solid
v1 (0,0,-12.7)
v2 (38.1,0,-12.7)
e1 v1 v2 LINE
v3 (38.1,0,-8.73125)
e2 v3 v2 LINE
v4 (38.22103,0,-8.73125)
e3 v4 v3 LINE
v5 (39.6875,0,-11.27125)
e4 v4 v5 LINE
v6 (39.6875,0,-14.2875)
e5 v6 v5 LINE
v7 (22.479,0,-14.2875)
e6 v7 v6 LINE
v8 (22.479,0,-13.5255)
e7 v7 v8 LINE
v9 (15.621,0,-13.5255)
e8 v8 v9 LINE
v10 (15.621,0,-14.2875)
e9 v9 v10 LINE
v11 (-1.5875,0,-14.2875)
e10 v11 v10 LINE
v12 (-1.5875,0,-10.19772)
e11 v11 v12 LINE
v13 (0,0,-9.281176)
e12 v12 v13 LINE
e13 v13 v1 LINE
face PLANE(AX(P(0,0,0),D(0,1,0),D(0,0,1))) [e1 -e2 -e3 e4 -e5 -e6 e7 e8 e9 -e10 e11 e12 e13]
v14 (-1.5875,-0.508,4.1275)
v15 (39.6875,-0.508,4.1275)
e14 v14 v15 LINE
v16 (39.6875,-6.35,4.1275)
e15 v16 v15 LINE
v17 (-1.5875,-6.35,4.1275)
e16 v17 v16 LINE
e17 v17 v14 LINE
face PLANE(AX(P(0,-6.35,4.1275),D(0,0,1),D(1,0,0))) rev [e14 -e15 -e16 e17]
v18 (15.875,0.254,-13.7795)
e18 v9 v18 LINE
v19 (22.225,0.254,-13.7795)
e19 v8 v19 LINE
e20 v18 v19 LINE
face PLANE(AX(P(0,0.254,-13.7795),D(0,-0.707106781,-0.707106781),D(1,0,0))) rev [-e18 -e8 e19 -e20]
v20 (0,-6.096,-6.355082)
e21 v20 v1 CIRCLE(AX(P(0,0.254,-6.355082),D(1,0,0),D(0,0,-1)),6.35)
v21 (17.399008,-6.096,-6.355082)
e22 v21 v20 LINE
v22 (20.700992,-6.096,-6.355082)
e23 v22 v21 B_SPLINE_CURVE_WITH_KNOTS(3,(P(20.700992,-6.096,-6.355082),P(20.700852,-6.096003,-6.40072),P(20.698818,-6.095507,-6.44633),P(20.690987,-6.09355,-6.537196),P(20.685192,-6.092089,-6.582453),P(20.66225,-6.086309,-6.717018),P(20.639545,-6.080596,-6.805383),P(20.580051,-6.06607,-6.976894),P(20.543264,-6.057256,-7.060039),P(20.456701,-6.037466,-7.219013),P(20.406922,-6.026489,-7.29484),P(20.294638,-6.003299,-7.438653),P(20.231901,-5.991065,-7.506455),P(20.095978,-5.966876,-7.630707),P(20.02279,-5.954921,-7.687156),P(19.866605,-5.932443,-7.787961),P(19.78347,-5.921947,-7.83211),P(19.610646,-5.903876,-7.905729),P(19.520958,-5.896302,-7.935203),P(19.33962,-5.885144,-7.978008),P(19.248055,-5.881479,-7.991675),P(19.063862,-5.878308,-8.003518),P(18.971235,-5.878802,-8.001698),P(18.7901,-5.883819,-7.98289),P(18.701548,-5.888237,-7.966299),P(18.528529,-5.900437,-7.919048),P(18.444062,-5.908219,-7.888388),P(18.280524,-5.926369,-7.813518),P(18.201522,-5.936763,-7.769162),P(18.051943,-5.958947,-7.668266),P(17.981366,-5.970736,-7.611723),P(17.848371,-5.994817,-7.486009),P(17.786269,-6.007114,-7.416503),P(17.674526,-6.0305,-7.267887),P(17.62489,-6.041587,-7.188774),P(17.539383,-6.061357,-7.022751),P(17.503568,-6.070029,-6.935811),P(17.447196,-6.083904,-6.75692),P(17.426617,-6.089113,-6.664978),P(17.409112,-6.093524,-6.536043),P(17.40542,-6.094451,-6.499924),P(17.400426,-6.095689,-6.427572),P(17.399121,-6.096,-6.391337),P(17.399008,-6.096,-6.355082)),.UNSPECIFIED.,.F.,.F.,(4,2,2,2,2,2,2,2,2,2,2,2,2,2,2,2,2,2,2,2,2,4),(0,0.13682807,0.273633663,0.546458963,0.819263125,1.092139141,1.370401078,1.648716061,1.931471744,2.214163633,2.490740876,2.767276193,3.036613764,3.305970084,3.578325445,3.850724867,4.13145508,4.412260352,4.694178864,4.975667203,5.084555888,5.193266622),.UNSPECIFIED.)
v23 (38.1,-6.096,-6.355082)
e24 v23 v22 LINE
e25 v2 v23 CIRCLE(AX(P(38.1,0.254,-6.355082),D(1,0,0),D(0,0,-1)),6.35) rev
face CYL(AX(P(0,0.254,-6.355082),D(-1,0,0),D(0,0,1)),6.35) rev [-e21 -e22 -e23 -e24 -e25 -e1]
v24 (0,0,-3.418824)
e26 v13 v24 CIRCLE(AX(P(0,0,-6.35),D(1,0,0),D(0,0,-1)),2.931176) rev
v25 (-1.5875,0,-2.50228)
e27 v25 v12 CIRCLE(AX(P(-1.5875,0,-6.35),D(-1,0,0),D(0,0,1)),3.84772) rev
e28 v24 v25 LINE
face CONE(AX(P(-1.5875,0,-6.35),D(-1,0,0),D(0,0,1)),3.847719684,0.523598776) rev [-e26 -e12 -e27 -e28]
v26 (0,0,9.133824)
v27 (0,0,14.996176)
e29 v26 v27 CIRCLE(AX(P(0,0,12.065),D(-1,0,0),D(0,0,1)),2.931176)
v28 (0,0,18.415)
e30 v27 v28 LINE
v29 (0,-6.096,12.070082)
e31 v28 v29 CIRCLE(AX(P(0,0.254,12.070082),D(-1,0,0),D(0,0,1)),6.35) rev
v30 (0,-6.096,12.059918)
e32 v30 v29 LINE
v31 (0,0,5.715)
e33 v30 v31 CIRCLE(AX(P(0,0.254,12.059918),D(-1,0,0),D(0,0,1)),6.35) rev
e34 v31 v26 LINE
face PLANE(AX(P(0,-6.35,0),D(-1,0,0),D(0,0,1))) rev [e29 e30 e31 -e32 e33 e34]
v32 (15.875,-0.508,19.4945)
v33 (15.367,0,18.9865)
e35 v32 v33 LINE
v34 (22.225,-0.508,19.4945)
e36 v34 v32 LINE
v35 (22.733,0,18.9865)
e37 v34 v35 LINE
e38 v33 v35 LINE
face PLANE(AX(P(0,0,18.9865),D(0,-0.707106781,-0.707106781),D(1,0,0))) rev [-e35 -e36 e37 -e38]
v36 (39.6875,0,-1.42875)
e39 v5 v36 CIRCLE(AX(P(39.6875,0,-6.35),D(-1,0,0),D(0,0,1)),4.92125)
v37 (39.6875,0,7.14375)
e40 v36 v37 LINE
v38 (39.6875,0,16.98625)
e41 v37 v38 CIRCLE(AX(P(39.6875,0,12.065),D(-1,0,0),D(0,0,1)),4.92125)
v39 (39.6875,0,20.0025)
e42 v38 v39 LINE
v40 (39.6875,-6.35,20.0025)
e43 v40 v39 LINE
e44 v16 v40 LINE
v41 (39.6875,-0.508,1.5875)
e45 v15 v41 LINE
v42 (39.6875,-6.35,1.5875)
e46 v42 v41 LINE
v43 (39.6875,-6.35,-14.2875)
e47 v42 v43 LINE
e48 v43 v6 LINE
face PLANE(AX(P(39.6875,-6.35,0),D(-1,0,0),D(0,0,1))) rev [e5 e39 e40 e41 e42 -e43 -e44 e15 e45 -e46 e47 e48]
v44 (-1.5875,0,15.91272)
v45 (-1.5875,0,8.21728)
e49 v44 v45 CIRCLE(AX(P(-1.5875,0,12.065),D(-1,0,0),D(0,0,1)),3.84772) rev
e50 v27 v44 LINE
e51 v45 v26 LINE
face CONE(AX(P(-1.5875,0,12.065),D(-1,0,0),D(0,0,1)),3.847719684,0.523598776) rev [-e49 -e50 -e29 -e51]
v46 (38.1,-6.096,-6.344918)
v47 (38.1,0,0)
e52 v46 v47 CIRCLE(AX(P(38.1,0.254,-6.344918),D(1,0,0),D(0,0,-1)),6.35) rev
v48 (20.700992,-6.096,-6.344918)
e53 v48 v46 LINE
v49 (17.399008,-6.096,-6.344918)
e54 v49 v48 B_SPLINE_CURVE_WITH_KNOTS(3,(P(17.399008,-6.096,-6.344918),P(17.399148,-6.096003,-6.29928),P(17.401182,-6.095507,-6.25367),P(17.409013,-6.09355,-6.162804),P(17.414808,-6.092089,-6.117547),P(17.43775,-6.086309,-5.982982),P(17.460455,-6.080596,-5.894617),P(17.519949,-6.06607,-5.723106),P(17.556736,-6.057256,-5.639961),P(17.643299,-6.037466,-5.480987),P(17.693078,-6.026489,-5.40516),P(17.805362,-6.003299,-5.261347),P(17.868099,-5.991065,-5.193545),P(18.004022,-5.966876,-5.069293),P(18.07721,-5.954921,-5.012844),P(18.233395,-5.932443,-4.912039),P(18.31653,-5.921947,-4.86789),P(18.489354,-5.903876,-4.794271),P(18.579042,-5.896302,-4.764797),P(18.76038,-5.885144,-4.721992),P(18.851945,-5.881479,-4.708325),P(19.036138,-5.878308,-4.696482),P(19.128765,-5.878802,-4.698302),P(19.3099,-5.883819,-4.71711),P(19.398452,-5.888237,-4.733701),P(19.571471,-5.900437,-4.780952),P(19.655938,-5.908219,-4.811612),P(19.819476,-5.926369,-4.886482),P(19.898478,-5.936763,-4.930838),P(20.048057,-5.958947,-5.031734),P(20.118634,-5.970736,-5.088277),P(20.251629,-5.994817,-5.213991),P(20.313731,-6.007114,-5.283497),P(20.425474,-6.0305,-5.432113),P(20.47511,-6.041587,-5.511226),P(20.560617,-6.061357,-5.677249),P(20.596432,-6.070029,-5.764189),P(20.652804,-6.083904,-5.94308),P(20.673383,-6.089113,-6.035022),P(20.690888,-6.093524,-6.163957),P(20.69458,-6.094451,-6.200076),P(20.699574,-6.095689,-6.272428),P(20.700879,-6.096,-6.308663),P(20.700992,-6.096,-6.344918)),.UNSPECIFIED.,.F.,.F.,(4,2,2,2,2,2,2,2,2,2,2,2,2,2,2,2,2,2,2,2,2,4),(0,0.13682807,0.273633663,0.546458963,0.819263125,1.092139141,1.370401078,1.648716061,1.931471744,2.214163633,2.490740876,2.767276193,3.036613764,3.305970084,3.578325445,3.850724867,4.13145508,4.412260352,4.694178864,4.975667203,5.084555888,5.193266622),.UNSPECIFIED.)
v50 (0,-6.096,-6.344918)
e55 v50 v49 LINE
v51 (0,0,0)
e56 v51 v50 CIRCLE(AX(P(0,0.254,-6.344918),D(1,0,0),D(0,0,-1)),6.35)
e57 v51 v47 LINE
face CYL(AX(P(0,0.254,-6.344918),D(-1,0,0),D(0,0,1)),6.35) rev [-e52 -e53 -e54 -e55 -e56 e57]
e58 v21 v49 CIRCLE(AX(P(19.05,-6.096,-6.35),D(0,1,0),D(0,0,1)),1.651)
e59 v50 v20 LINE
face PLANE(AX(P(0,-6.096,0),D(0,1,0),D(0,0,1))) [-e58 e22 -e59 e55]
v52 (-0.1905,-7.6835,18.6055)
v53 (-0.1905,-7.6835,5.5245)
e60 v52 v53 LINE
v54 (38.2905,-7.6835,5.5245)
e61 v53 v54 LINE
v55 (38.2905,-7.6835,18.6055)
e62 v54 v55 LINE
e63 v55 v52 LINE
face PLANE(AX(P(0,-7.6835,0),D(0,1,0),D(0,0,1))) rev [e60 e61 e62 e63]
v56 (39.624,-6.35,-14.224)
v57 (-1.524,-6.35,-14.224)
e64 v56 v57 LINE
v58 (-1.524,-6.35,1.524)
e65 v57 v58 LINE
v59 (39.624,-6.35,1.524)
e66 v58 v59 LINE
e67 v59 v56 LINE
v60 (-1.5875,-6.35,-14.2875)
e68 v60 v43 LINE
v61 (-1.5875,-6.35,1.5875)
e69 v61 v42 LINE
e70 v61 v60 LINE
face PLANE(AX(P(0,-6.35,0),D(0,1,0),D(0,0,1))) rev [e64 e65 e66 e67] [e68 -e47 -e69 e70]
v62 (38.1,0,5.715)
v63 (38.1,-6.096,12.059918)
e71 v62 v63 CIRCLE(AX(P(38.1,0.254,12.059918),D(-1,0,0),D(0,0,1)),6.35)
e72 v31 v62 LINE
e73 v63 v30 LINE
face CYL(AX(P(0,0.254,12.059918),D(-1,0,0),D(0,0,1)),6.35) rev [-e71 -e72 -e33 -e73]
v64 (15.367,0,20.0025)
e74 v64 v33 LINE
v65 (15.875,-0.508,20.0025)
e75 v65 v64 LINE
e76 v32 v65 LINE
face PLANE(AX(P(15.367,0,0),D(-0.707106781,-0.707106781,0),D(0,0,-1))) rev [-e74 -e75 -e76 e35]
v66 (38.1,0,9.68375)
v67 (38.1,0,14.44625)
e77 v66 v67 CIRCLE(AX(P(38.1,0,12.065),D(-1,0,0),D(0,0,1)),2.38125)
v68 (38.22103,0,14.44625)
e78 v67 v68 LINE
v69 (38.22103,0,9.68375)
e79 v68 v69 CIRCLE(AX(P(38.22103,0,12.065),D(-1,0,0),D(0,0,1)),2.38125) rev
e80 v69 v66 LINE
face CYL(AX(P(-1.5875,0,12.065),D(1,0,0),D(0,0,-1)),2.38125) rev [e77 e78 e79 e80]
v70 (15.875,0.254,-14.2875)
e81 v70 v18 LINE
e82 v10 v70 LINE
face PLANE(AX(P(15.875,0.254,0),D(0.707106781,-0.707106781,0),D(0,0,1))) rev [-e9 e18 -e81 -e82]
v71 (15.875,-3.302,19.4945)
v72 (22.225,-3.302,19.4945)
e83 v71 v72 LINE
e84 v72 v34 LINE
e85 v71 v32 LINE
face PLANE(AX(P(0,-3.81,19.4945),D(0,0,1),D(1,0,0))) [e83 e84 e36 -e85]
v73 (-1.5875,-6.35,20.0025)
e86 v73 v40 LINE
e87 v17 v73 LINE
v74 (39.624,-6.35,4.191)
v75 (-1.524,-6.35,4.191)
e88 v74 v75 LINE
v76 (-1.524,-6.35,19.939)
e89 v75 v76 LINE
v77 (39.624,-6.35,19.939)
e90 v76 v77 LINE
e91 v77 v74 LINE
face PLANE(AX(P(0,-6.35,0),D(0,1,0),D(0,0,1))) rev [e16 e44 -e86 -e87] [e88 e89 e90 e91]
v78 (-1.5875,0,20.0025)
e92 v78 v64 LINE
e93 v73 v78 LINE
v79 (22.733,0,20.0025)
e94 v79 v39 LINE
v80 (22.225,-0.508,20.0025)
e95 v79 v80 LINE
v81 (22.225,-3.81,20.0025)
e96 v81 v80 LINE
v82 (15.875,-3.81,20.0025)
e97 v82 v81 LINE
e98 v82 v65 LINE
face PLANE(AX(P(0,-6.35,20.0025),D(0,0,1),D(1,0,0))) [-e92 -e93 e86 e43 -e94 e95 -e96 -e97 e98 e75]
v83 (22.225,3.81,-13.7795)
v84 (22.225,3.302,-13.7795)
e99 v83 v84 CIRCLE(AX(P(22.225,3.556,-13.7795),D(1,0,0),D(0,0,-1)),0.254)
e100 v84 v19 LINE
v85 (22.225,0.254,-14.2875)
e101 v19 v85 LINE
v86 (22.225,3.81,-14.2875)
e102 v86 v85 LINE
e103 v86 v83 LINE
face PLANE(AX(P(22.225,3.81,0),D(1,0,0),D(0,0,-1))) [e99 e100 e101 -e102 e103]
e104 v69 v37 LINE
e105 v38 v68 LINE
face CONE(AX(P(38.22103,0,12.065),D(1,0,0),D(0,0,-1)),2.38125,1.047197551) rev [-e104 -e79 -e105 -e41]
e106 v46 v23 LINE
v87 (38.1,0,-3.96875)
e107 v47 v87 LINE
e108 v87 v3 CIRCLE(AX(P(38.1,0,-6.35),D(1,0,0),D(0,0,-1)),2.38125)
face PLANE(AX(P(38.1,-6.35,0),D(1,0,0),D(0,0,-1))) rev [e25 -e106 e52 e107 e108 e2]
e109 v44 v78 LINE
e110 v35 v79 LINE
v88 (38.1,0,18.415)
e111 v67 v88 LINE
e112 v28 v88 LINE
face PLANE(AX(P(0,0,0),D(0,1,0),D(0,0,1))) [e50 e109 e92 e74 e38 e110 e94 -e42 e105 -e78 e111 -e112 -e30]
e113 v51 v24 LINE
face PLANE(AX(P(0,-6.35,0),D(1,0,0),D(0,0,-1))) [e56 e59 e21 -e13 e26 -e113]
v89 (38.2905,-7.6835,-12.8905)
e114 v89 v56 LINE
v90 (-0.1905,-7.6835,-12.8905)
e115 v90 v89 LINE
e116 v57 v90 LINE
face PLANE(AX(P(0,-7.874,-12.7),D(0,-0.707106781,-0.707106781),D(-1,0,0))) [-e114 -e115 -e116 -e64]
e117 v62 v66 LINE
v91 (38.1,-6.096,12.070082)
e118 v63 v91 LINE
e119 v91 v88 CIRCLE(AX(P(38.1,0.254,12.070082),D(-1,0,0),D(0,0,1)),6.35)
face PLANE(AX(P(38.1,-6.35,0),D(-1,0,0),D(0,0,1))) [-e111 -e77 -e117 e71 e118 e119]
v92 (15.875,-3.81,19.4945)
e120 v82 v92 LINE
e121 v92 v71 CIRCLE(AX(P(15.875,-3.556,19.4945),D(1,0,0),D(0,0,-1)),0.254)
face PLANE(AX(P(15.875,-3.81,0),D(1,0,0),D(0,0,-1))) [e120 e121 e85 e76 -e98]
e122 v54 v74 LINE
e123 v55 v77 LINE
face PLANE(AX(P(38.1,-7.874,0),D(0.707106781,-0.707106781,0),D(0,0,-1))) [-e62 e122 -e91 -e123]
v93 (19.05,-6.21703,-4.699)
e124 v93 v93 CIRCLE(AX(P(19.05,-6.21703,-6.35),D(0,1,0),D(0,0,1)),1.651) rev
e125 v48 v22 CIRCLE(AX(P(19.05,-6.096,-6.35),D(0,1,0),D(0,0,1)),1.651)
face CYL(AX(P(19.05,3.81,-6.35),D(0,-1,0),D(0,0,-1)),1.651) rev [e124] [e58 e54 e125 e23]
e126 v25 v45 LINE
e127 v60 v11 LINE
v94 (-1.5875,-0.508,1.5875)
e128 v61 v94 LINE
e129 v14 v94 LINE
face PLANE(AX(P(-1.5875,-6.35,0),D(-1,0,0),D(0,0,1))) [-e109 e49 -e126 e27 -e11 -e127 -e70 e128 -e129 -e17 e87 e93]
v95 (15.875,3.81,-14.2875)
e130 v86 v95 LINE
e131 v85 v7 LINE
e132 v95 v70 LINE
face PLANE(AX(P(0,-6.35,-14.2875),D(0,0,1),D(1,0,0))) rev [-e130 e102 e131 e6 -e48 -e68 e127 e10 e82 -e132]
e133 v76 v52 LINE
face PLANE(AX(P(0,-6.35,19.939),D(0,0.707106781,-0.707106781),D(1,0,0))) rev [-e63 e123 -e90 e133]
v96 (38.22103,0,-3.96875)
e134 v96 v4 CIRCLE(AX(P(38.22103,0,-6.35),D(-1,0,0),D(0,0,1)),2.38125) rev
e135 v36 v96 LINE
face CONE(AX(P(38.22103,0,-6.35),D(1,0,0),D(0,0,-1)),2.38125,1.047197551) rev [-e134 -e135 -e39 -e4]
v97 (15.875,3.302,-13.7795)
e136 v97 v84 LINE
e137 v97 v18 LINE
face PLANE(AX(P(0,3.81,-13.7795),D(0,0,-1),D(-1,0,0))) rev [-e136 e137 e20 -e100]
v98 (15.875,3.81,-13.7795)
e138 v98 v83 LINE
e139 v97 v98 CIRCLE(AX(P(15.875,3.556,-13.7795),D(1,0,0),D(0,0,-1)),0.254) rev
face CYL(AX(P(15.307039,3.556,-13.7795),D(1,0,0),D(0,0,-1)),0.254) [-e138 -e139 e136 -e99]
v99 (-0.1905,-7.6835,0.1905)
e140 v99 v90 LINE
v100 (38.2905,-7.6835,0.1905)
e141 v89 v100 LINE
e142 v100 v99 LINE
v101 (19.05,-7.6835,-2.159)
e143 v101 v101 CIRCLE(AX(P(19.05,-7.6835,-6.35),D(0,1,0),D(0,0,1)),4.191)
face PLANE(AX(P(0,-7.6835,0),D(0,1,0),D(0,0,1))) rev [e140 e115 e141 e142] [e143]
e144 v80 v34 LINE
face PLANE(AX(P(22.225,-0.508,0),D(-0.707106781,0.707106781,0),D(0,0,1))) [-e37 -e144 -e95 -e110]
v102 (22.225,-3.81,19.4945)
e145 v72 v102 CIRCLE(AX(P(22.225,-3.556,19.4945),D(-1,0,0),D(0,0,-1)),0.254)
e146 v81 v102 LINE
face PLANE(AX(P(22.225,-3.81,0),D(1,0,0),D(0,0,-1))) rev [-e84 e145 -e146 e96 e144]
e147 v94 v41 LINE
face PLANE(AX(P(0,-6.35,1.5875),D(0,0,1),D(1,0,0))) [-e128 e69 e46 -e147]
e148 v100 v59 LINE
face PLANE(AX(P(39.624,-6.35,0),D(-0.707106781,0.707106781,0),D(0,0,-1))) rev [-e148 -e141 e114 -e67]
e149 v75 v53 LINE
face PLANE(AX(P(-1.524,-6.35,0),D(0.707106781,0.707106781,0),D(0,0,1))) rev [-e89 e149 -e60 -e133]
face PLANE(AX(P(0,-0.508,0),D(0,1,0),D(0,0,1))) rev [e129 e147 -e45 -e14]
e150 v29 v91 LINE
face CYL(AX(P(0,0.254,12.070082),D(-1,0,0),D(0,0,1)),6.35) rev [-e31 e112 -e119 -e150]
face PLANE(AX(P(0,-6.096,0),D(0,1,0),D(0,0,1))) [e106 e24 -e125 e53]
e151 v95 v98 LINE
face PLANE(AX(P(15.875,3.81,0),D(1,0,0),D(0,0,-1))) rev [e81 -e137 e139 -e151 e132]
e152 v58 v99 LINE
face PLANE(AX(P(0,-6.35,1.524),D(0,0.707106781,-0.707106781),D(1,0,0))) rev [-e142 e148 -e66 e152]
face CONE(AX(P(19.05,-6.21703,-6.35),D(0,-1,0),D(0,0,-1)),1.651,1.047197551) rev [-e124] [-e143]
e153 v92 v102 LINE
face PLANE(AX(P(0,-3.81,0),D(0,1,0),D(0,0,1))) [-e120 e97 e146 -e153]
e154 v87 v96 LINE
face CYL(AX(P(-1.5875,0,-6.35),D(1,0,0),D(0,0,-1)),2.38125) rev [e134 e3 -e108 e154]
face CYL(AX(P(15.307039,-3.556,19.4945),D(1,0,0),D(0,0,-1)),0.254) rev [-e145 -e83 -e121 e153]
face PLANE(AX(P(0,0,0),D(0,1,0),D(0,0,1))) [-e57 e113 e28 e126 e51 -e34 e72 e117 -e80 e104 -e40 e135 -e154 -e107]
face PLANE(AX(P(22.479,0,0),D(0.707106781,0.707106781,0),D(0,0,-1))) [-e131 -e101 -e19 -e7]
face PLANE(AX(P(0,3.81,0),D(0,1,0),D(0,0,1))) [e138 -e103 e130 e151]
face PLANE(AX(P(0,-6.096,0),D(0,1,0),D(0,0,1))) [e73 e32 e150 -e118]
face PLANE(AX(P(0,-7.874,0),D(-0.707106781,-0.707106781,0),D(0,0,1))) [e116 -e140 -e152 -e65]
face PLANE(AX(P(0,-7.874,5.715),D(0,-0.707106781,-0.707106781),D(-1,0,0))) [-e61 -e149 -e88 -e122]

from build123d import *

# Parameters (mm, degrees)
BOSS_EXTRUDE1_DEPTH  = 6.35
BOSS_EXTRUDE2_START  = -6.096
SKETCH1_3_W          = 38.1
SKETCH1_3_H          = 12.7
BOSS_EXTRUDE2_DEPTH  = 1.5875
SKETCH1_5_W          = 41.275
SKETCH1_5_H          = 1.27
BOSS_EXTRUDE4_DEPTH  = 0.508
CHAMFER2_SIZE        = 1.524
SKETCH5_R            = 2.38125
CUT_EXTRUDE1_DEPTH   = 47.505502938
CHAMFER3_SIZE        = 1.466469684
CHAMFER3_SIZE_2      = 2.54
SKETCH6_W            = 6.35
SKETCH6_H            = 0.508
BOSS_EXTRUDE7_DEPTH  = 3.81
BOSS_EXTRUDE10_DEPTH = 6.35
SKETCH6_5_W          = 6.35
SKETCH6_5_H          = 0.508
CUT_EXTRUDE2_DEPTH   = 3.81
CUT_EXTRUDE3_DEPTH   = 6.35
CHAMFER4_SIZE        = 0.508
CHAMFER5_SIZE        = 0.254
SKETCH10_R           = 1.651
CUT_EXTRUDE4_DEPTH   = 46.905317826
CHAMFER6_SIZE        = 2.54
CHAMFER6_SIZE2       = 1.466469684
FILLET1_R            = 6.35


with BuildPart() as part:
    # Sketch1 → Boss-Extrude1 (new body)
    with BuildSketch(Plane(origin=(0, 0, 0), x_dir=(1, 0, 0), z_dir=(0, 1, 0))):
        Polygon((-1.5875, 6.35), (-1.5875, -1.5875), (39.6875, -1.5875), (39.6875, 6.35), (38.1, 6.35), (38.1, 0), (0, 0), (0, 6.35), align=None)
        Polygon((39.6875, -4.1275), (-1.5875, -4.1275), (-1.5875, -12.065), (0, -12.065), (0, -5.715), (38.1, -5.715), (38.1, -12.065), (39.6875, -12.065), align=None)
        Polygon((0, -12.065), (-1.5875, -12.065), (-1.5875, -20.0025), (39.6875, -20.0025), (39.6875, -12.065), (38.1, -12.065), (38.1, -18.415), (0, -18.415), align=None)
        Polygon((-1.5875, 14.2875), (-1.5875, 6.35), (0, 6.35), (0, 12.7), (38.1, 12.7), (38.1, 6.35), (39.6875, 6.35), (39.6875, 14.2875), align=None)
    extrude(amount=-BOSS_EXTRUDE1_DEPTH)

    # Sketch1<3> → Boss-Extrude2 (add)
    with BuildSketch(Plane(origin=(0, 0, 0), x_dir=(1, 0, 0), z_dir=(0, 1, 0)).offset(BOSS_EXTRUDE2_START)):
        with Locations((19.05, -12.065)):
            Rectangle(SKETCH1_3_W, SKETCH1_3_H)
        with Locations((19.05, 6.35)):
            Rectangle(SKETCH1_3_W, SKETCH1_3_H)
    extrude(amount=-BOSS_EXTRUDE2_DEPTH)

    # Sketch1<5> → Boss-Extrude4 (add)
    with BuildSketch(Plane(origin=(0, 0, 0), x_dir=(1, 0, 0), z_dir=(0, 1, 0))):
        with Locations((19.05, -2.2225)):
            Rectangle(SKETCH1_5_W, SKETCH1_5_H)
        with Locations((19.05, -3.4925)):
            Rectangle(SKETCH1_5_W, SKETCH1_5_H)
    extrude(amount=-BOSS_EXTRUDE4_DEPTH)

    # Chamfer2
    # the kernel refuses this chamfer: 1.524 mm, written as the material it adds along each edge
    with BuildSketch(Plane(origin=(38.1, -6.35, 18.415), x_dir=(0, 0, 1), z_dir=(-1, 0, 0))) as chamfer2_piece_1_section:
        Polygon((CHAMFER2_SIZE, 0), (0, -CHAMFER2_SIZE), (0, 0), align=None)
    chamfer2_piece_1 = extrude(amount=38.1, mode=Mode.PRIVATE)
    chamfer2_piece_1 = split(chamfer2_piece_1, bisect_by=Plane(origin=(38.1, -7.6835, 18.415), z_dir=(0, 1, 0)), keep=Keep.TOP, mode=Mode.PRIVATE)
    add(chamfer2_piece_1)
    with BuildSketch(Plane(origin=(0, -6.35, 5.715), x_dir=(-1, 0, 0), z_dir=(0, 0, 1))) as chamfer2_piece_2_section:
        Polygon((CHAMFER2_SIZE, 0), (0, CHAMFER2_SIZE), (0, 0), align=None)
    chamfer2_piece_2 = extrude(amount=12.7, mode=Mode.PRIVATE)
    chamfer2_piece_2 = split(chamfer2_piece_2, bisect_by=Plane(origin=(0, -7.6835, 5.715), z_dir=(0, 1, 0)), keep=Keep.TOP, mode=Mode.PRIVATE)
    add(chamfer2_piece_2)
    with BuildSketch(Plane(origin=(38.1, -6.35, 18.415), x_dir=(1, 0, 0), z_dir=(0, 0, -1))) as chamfer2_piece_3_section:
        Polygon((CHAMFER2_SIZE, 0), (0, CHAMFER2_SIZE), (0, 0), align=None)
    chamfer2_piece_3 = extrude(amount=12.7, mode=Mode.PRIVATE)
    chamfer2_piece_3 = split(chamfer2_piece_3, bisect_by=Plane(origin=(38.1, -7.6835, 18.415), z_dir=(0, 1, 0)), keep=Keep.TOP, mode=Mode.PRIVATE)
    add(chamfer2_piece_3)
    with BuildSketch(Plane(origin=(0, -6.35, 5.715), x_dir=(0, 0, -1), z_dir=(1, 0, 0))) as chamfer2_piece_4_section:
        Polygon((CHAMFER2_SIZE, 0), (0, -CHAMFER2_SIZE), (0, 0), align=None)
    chamfer2_piece_4 = extrude(amount=38.1, mode=Mode.PRIVATE)
    chamfer2_piece_4 = split(chamfer2_piece_4, bisect_by=Plane(origin=(0, -7.6835, 5.715), z_dir=(0, 1, 0)), keep=Keep.TOP, mode=Mode.PRIVATE)
    add(chamfer2_piece_4)
    with BuildSketch(Plane(origin=(38.1, -6.35, 0), x_dir=(0, 0, 1), z_dir=(-1, 0, 0))) as chamfer2_piece_5_section:
        Polygon((CHAMFER2_SIZE, 0), (0, -CHAMFER2_SIZE), (0, 0), align=None)
    chamfer2_piece_5 = extrude(amount=38.1, mode=Mode.PRIVATE)
    chamfer2_piece_5 = split(chamfer2_piece_5, bisect_by=Plane(origin=(38.1, -7.6835, 0), z_dir=(0, 1, 0)), keep=Keep.TOP, mode=Mode.PRIVATE)
    add(chamfer2_piece_5)
    with BuildSketch(Plane(origin=(38.1, -6.35, 0), x_dir=(1, 0, 0), z_dir=(0, 0, -1))) as chamfer2_piece_6_section:
        Polygon((CHAMFER2_SIZE, 0), (0, CHAMFER2_SIZE), (0, 0), align=None)
    chamfer2_piece_6 = extrude(amount=12.7, mode=Mode.PRIVATE)
    chamfer2_piece_6 = split(chamfer2_piece_6, bisect_by=Plane(origin=(38.1, -7.6835, 0), z_dir=(0, 1, 0)), keep=Keep.TOP, mode=Mode.PRIVATE)
    add(chamfer2_piece_6)
    with BuildSketch(Plane(origin=(0, -6.35, -12.7), x_dir=(-1, 0, 0), z_dir=(0, 0, 1))) as chamfer2_piece_7_section:
        Polygon((CHAMFER2_SIZE, 0), (0, CHAMFER2_SIZE), (0, 0), align=None)
    chamfer2_piece_7 = extrude(amount=12.7, mode=Mode.PRIVATE)
    chamfer2_piece_7 = split(chamfer2_piece_7, bisect_by=Plane(origin=(0, -7.6835, -12.7), z_dir=(0, 1, 0)), keep=Keep.TOP, mode=Mode.PRIVATE)
    add(chamfer2_piece_7)
    with BuildSketch(Plane(origin=(0, -6.35, -12.7), x_dir=(0, 0, -1), z_dir=(1, 0, 0))) as chamfer2_piece_8_section:
        Polygon((CHAMFER2_SIZE, 0), (0, -CHAMFER2_SIZE), (0, 0), align=None)
    chamfer2_piece_8 = extrude(amount=38.1, mode=Mode.PRIVATE)
    chamfer2_piece_8 = split(chamfer2_piece_8, bisect_by=Plane(origin=(0, -7.6835, -12.7), z_dir=(0, 1, 0)), keep=Keep.TOP, mode=Mode.PRIVATE)
    add(chamfer2_piece_8)
    with BuildSketch(Plane(origin=(38.1, -6.35, 22.334244874), x_dir=(1, 0, 0), z_dir=(0, 0, -1))) as chamfer2_piece_9a_section:
        Polygon((CHAMFER2_SIZE, 0), (0, CHAMFER2_SIZE), (0, 0), align=None)
    chamfer2_piece_9a = extrude(amount=16.619244874, mode=Mode.PRIVATE)
    chamfer2_piece_9a = split(chamfer2_piece_9a, bisect_by=Plane(origin=(38.1, -6.35, 20.0025), z_dir=(0, 0, -1)), keep=Keep.TOP, mode=Mode.PRIVATE)
    chamfer2_piece_9a = split(chamfer2_piece_9a, bisect_by=Plane(origin=(38.1, -6.35, 18.415), z_dir=(0, 0, 1)), keep=Keep.TOP, mode=Mode.PRIVATE)
    chamfer2_piece_9a = split(chamfer2_piece_9a, bisect_by=Plane(origin=(38.1, -7.6835, 22.334244874), z_dir=(0, 1, 0)), keep=Keep.TOP, mode=Mode.PRIVATE)
    with BuildSketch(Plane(origin=(42.019244874, -6.35, 18.415), x_dir=(0, 0, 1), z_dir=(-1, 0, 0))) as chamfer2_piece_9b_section:
        Polygon((CHAMFER2_SIZE, 0), (0, -CHAMFER2_SIZE), (0, 0), align=None)
    chamfer2_piece_9b = extrude(amount=42.019244874, mode=Mode.PRIVATE)
    chamfer2_piece_9b = split(chamfer2_piece_9b, bisect_by=Plane(origin=(39.6875, -6.35, 18.415), z_dir=(-1, 0, 0)), keep=Keep.TOP, mode=Mode.PRIVATE)
    chamfer2_piece_9b = split(chamfer2_piece_9b, bisect_by=Plane(origin=(42.019244874, -7.6835, 18.415), z_dir=(0, 1, 0)), keep=Keep.TOP, mode=Mode.PRIVATE)
    chamfer2_piece_9b = split(chamfer2_piece_9b, bisect_by=Plane(origin=(38.1, -6.35, 18.415), z_dir=(1, 0, 0)), keep=Keep.TOP, mode=Mode.PRIVATE)
    chamfer2_piece_9 = chamfer2_piece_9a & chamfer2_piece_9b
    add(chamfer2_piece_9)
    with BuildSketch(Plane(origin=(0, -6.35, 5.715), x_dir=(-1, 0, 0), z_dir=(0, 0, 1))) as chamfer2_piece_10a_section:
        Polygon((CHAMFER2_SIZE, 0), (0, CHAMFER2_SIZE), (0, 0), align=None)
    chamfer2_piece_10a = extrude(amount=16.619244874, mode=Mode.PRIVATE)
    chamfer2_piece_10a = split(chamfer2_piece_10a, bisect_by=Plane(origin=(0, -6.35, 20.0025), z_dir=(0, 0, -1)), keep=Keep.TOP, mode=Mode.PRIVATE)
    chamfer2_piece_10a = split(chamfer2_piece_10a, bisect_by=Plane(origin=(0, -6.35, 18.415), z_dir=(0, 0, 1)), keep=Keep.TOP, mode=Mode.PRIVATE)
    chamfer2_piece_10a = split(chamfer2_piece_10a, bisect_by=Plane(origin=(0, -7.6835, 5.715), z_dir=(0, 1, 0)), keep=Keep.TOP, mode=Mode.PRIVATE)
    with BuildSketch(Plane(origin=(38.1, -6.35, 18.415), x_dir=(0, 0, 1), z_dir=(-1, 0, 0))) as chamfer2_piece_10b_section:
        Polygon((CHAMFER2_SIZE, 0), (0, -CHAMFER2_SIZE), (0, 0), align=None)
    chamfer2_piece_10b = extrude(amount=42.019244874, mode=Mode.PRIVATE)
    chamfer2_piece_10b = split(chamfer2_piece_10b, bisect_by=Plane(origin=(-1.5875, -6.35, 18.415), z_dir=(1, 0, 0)), keep=Keep.TOP, mode=Mode.PRIVATE)
    chamfer2_piece_10b = split(chamfer2_piece_10b, bisect_by=Plane(origin=(0, -6.35, 18.415), z_dir=(-1, 0, 0)), keep=Keep.TOP, mode=Mode.PRIVATE)
    chamfer2_piece_10b = split(chamfer2_piece_10b, bisect_by=Plane(origin=(38.1, -7.6835, 18.415), z_dir=(0, 1, 0)), keep=Keep.TOP, mode=Mode.PRIVATE)
    chamfer2_piece_10 = chamfer2_piece_10a & chamfer2_piece_10b
    add(chamfer2_piece_10)
    with BuildSketch(Plane(origin=(0, -6.35, 1.795755126), x_dir=(-1, 0, 0), z_dir=(0, 0, 1))) as chamfer2_piece_11a_section:
        Polygon((CHAMFER2_SIZE, 0), (0, CHAMFER2_SIZE), (0, 0), align=None)
    chamfer2_piece_11a = extrude(amount=16.619244874, mode=Mode.PRIVATE)
    chamfer2_piece_11a = split(chamfer2_piece_11a, bisect_by=Plane(origin=(0, -6.35, 4.1275), z_dir=(0, 0, 1)), keep=Keep.TOP, mode=Mode.PRIVATE)
    chamfer2_piece_11a = split(chamfer2_piece_11a, bisect_by=Plane(origin=(0, -7.6835, 1.795755126), z_dir=(0, 1, 0)), keep=Keep.TOP, mode=Mode.PRIVATE)
    chamfer2_piece_11a = split(chamfer2_piece_11a, bisect_by=Plane(origin=(0, -6.35, 5.715), z_dir=(0, 0, -1)), keep=Keep.TOP, mode=Mode.PRIVATE)
    with BuildSketch(Plane(origin=(-3.919244874, -6.35, 5.715), x_dir=(0, 0, -1), z_dir=(1, 0, 0))) as chamfer2_piece_11b_section:
        Polygon((CHAMFER2_SIZE, 0), (0, -CHAMFER2_SIZE), (0, 0), align=None)
    chamfer2_piece_11b = extrude(amount=42.019244874, mode=Mode.PRIVATE)
    chamfer2_piece_11b = split(chamfer2_piece_11b, bisect_by=Plane(origin=(-1.5875, -6.35, 5.715), z_dir=(1, 0, 0)), keep=Keep.TOP, mode=Mode.PRIVATE)
    chamfer2_piece_11b = split(chamfer2_piece_11b, bisect_by=Plane(origin=(-3.919244874, -7.6835, 5.715), z_dir=(0, 1, 0)), keep=Keep.TOP, mode=Mode.PRIVATE)
    chamfer2_piece_11b = split(chamfer2_piece_11b, bisect_by=Plane(origin=(0, -6.35, 5.715), z_dir=(-1, 0, 0)), keep=Keep.TOP, mode=Mode.PRIVATE)
    chamfer2_piece_11 = chamfer2_piece_11a & chamfer2_piece_11b
    add(chamfer2_piece_11)
    with BuildSketch(Plane(origin=(0, -6.35, 5.715), x_dir=(0, 0, -1), z_dir=(1, 0, 0))) as chamfer2_piece_12a_section:
        Polygon((CHAMFER2_SIZE, 0), (0, -CHAMFER2_SIZE), (0, 0), align=None)
    chamfer2_piece_12a = extrude(amount=42.019244874, mode=Mode.PRIVATE)
    chamfer2_piece_12a = split(chamfer2_piece_12a, bisect_by=Plane(origin=(39.6875, -6.35, 5.715), z_dir=(-1, 0, 0)), keep=Keep.TOP, mode=Mode.PRIVATE)
    chamfer2_piece_12a = split(chamfer2_piece_12a, bisect_by=Plane(origin=(0, -7.6835, 5.715), z_dir=(0, 1, 0)), keep=Keep.TOP, mode=Mode.PRIVATE)
    chamfer2_piece_12a = split(chamfer2_piece_12a, bisect_by=Plane(origin=(38.1, -6.35, 5.715), z_dir=(1, 0, 0)), keep=Keep.TOP, mode=Mode.PRIVATE)
    with BuildSketch(Plane(origin=(38.1, -6.35, 18.415), x_dir=(1, 0, 0), z_dir=(0, 0, -1))) as chamfer2_piece_12b_section:
        Polygon((CHAMFER2_SIZE, 0), (0, CHAMFER2_SIZE), (0, 0), align=None)
    chamfer2_piece_12b = extrude(amount=16.619244874, mode=Mode.PRIVATE)
    chamfer2_piece_12b = split(chamfer2_piece_12b, bisect_by=Plane(origin=(38.1, -6.35, 4.1275), z_dir=(0, 0, 1)), keep=Keep.TOP, mode=Mode.PRIVATE)
    chamfer2_piece_12b = split(chamfer2_piece_12b, bisect_by=Plane(origin=(38.1, -7.6835, 18.415), z_dir=(0, 1, 0)), keep=Keep.TOP, mode=Mode.PRIVATE)
    chamfer2_piece_12b = split(chamfer2_piece_12b, bisect_by=Plane(origin=(38.1, -6.35, 5.715), z_dir=(0, 0, -1)), keep=Keep.TOP, mode=Mode.PRIVATE)
    chamfer2_piece_12 = chamfer2_piece_12a & chamfer2_piece_12b
    add(chamfer2_piece_12)
    with BuildSketch(Plane(origin=(38.1, -6.35, 3.919244874), x_dir=(1, 0, 0), z_dir=(0, 0, -1))) as chamfer2_piece_13a_section:
        Polygon((CHAMFER2_SIZE, 0), (0, CHAMFER2_SIZE), (0, 0), align=None)
    chamfer2_piece_13a = extrude(amount=16.619244874, mode=Mode.PRIVATE)
    chamfer2_piece_13a = split(chamfer2_piece_13a, bisect_by=Plane(origin=(38.1, -6.35, 1.5875), z_dir=(0, 0, -1)), keep=Keep.TOP, mode=Mode.PRIVATE)
    chamfer2_piece_13a = split(chamfer2_piece_13a, bisect_by=Plane(origin=(38.1, -7.6835, 3.919244874), z_dir=(0, 1, 0)), keep=Keep.TOP, mode=Mode.PRIVATE)
    chamfer2_piece_13a = split(chamfer2_piece_13a, bisect_by=Plane(origin=(38.1, -6.35, 0), z_dir=(0, 0, 1)), keep=Keep.TOP, mode=Mode.PRIVATE)
    with BuildSketch(Plane(origin=(42.019244874, -6.35, 0), x_dir=(0, 0, 1), z_dir=(-1, 0, 0))) as chamfer2_piece_13b_section:
        Polygon((CHAMFER2_SIZE, 0), (0, -CHAMFER2_SIZE), (0, 0), align=None)
    chamfer2_piece_13b = extrude(amount=42.019244874, mode=Mode.PRIVATE)
    chamfer2_piece_13b = split(chamfer2_piece_13b, bisect_by=Plane(origin=(39.6875, -6.35, 0), z_dir=(-1, 0, 0)), keep=Keep.TOP, mode=Mode.PRIVATE)
    chamfer2_piece_13b = split(chamfer2_piece_13b, bisect_by=Plane(origin=(42.019244874, -7.6835, 0), z_dir=(0, 1, 0)), keep=Keep.TOP, mode=Mode.PRIVATE)
    chamfer2_piece_13b = split(chamfer2_piece_13b, bisect_by=Plane(origin=(38.1, -6.35, 0), z_dir=(1, 0, 0)), keep=Keep.TOP, mode=Mode.PRIVATE)
    chamfer2_piece_13 = chamfer2_piece_13a & chamfer2_piece_13b
    add(chamfer2_piece_13)
    with BuildSketch(Plane(origin=(38.1, -6.35, 0), x_dir=(0, 0, 1), z_dir=(-1, 0, 0))) as chamfer2_piece_14a_section:
        Polygon((CHAMFER2_SIZE, 0), (0, -CHAMFER2_SIZE), (0, 0), align=None)
    chamfer2_piece_14a = extrude(amount=42.019244874, mode=Mode.PRIVATE)
    chamfer2_piece_14a = split(chamfer2_piece_14a, bisect_by=Plane(origin=(-1.5875, -6.35, 0), z_dir=(1, 0, 0)), keep=Keep.TOP, mode=Mode.PRIVATE)
    chamfer2_piece_14a = split(chamfer2_piece_14a, bisect_by=Plane(origin=(38.1, -7.6835, 0), z_dir=(0, 1, 0)), keep=Keep.TOP, mode=Mode.PRIVATE)
    chamfer2_piece_14a = split(chamfer2_piece_14a, bisect_by=Plane(origin=(0, -6.35, 0), z_dir=(-1, 0, 0)), keep=Keep.TOP, mode=Mode.PRIVATE)
    with BuildSketch(Plane(origin=(0, -6.35, -12.7), x_dir=(-1, 0, 0), z_dir=(0, 0, 1))) as chamfer2_piece_14b_section:
        Polygon((CHAMFER2_SIZE, 0), (0, CHAMFER2_SIZE), (0, 0), align=None)
    chamfer2_piece_14b = extrude(amount=16.619244874, mode=Mode.PRIVATE)
    chamfer2_piece_14b = split(chamfer2_piece_14b, bisect_by=Plane(origin=(0, -6.35, 1.5875), z_dir=(0, 0, -1)), keep=Keep.TOP, mode=Mode.PRIVATE)
    chamfer2_piece_14b = split(chamfer2_piece_14b, bisect_by=Plane(origin=(0, -7.6835, -12.7), z_dir=(0, 1, 0)), keep=Keep.TOP, mode=Mode.PRIVATE)
    chamfer2_piece_14b = split(chamfer2_piece_14b, bisect_by=Plane(origin=(0, -6.35, 0), z_dir=(0, 0, 1)), keep=Keep.TOP, mode=Mode.PRIVATE)
    chamfer2_piece_14 = chamfer2_piece_14a & chamfer2_piece_14b
    add(chamfer2_piece_14)
    with BuildSketch(Plane(origin=(38.1, -6.35, 0), x_dir=(1, 0, 0), z_dir=(0, 0, -1))) as chamfer2_piece_15a_section:
        Polygon((CHAMFER2_SIZE, 0), (0, CHAMFER2_SIZE), (0, 0), align=None)
    chamfer2_piece_15a = extrude(amount=16.619244874, mode=Mode.PRIVATE)
    chamfer2_piece_15a = split(chamfer2_piece_15a, bisect_by=Plane(origin=(38.1, -6.35, -14.2875), z_dir=(0, 0, 1)), keep=Keep.TOP, mode=Mode.PRIVATE)
    chamfer2_piece_15a = split(chamfer2_piece_15a, bisect_by=Plane(origin=(38.1, -6.35, -12.7), z_dir=(0, 0, -1)), keep=Keep.TOP, mode=Mode.PRIVATE)
    chamfer2_piece_15a = split(chamfer2_piece_15a, bisect_by=Plane(origin=(38.1, -7.6835, 0), z_dir=(0, 1, 0)), keep=Keep.TOP, mode=Mode.PRIVATE)
    with BuildSketch(Plane(origin=(0, -6.35, -12.7), x_dir=(0, 0, -1), z_dir=(1, 0, 0))) as chamfer2_piece_15b_section:
        Polygon((CHAMFER2_SIZE, 0), (0, -CHAMFER2_SIZE), (0, 0), align=None)
    chamfer2_piece_15b = extrude(amount=42.019244874, mode=Mode.PRIVATE)
    chamfer2_piece_15b = split(chamfer2_piece_15b, bisect_by=Plane(origin=(39.6875, -6.35, -12.7), z_dir=(-1, 0, 0)), keep=Keep.TOP, mode=Mode.PRIVATE)
    chamfer2_piece_15b = split(chamfer2_piece_15b, bisect_by=Plane(origin=(0, -7.6835, -12.7), z_dir=(0, 1, 0)), keep=Keep.TOP, mode=Mode.PRIVATE)
    chamfer2_piece_15b = split(chamfer2_piece_15b, bisect_by=Plane(origin=(38.1, -6.35, -12.7), z_dir=(1, 0, 0)), keep=Keep.TOP, mode=Mode.PRIVATE)
    chamfer2_piece_15 = chamfer2_piece_15a & chamfer2_piece_15b
    add(chamfer2_piece_15)
    with BuildSketch(Plane(origin=(0, -6.35, -16.619244874), x_dir=(-1, 0, 0), z_dir=(0, 0, 1))) as chamfer2_piece_16a_section:
        Polygon((CHAMFER2_SIZE, 0), (0, CHAMFER2_SIZE), (0, 0), align=None)
    chamfer2_piece_16a = extrude(amount=16.619244874, mode=Mode.PRIVATE)
    chamfer2_piece_16a = split(chamfer2_piece_16a, bisect_by=Plane(origin=(0, -6.35, -14.2875), z_dir=(0, 0, 1)), keep=Keep.TOP, mode=Mode.PRIVATE)
    chamfer2_piece_16a = split(chamfer2_piece_16a, bisect_by=Plane(origin=(0, -6.35, -12.7), z_dir=(0, 0, -1)), keep=Keep.TOP, mode=Mode.PRIVATE)
    chamfer2_piece_16a = split(chamfer2_piece_16a, bisect_by=Plane(origin=(0, -7.6835, -16.619244874), z_dir=(0, 1, 0)), keep=Keep.TOP, mode=Mode.PRIVATE)
    with BuildSketch(Plane(origin=(-3.919244874, -6.35, -12.7), x_dir=(0, 0, -1), z_dir=(1, 0, 0))) as chamfer2_piece_16b_section:
        Polygon((CHAMFER2_SIZE, 0), (0, -CHAMFER2_SIZE), (0, 0), align=None)
    chamfer2_piece_16b = extrude(amount=42.019244874, mode=Mode.PRIVATE)
    chamfer2_piece_16b = split(chamfer2_piece_16b, bisect_by=Plane(origin=(-1.5875, -6.35, -12.7), z_dir=(1, 0, 0)), keep=Keep.TOP, mode=Mode.PRIVATE)
    chamfer2_piece_16b = split(chamfer2_piece_16b, bisect_by=Plane(origin=(0, -6.35, -12.7), z_dir=(-1, 0, 0)), keep=Keep.TOP, mode=Mode.PRIVATE)
    chamfer2_piece_16b = split(chamfer2_piece_16b, bisect_by=Plane(origin=(-3.919244874, -7.6835, -12.7), z_dir=(0, 1, 0)), keep=Keep.TOP, mode=Mode.PRIVATE)
    chamfer2_piece_16 = chamfer2_piece_16a & chamfer2_piece_16b
    add(chamfer2_piece_16)

    # Sketch5 → Cut-Extrude1 (cut, through all)
    with BuildSketch(Plane(origin=(39.6875, 0, 0), x_dir=(0, 0, -1), z_dir=(1, 0, 0))):
        with Locations((-12.065, 0)):
            Circle(SKETCH5_R)
        with Locations((6.35, 0)):
            Circle(SKETCH5_R)
    extrude(amount=-CUT_EXTRUDE1_DEPTH, mode=Mode.SUBTRACT)

    # Chamfer3
    # the kernel refuses this chamfer: 2.54, 1.466469684 mm, written as the material it takes off along each edge
    with BuildSketch(Plane(origin=(-1.5875, 0, 12.065), x_dir=(0, 0.9999950652018582, 0.0031415874858796654), z_dir=(0, 0.0031415874858796654, -0.9999950652018582))) as chamfer3_piece_1:
        Polygon((2.38125 + CHAMFER3_SIZE, 0), (2.38125, CHAMFER3_SIZE_2), (2.38125, 0), align=None)
    revolve(axis=Axis((-1.5875, 0, 12.065), (1, 0, 0)), revolution_arc=359.64, mode=Mode.SUBTRACT)
    with BuildSketch(Plane(origin=(-1.5875, 0, -6.35), x_dir=(0, 0.9999950652018582, 0.0031415874858789195), z_dir=(0, 0.0031415874858789195, -0.9999950652018582))) as chamfer3_piece_2:
        Polygon((2.38125 + CHAMFER3_SIZE, 0), (2.38125, CHAMFER3_SIZE_2), (2.38125, 0), align=None)
    revolve(axis=Axis((-1.5875, 0, -6.35), (1, 0, 0)), revolution_arc=359.64, mode=Mode.SUBTRACT)
    with BuildSketch(Plane(origin=(39.6875, 0, -6.35), x_dir=(0, 0.9999950652018582, 0.0031415874858789195), z_dir=(0, 0.0031415874858789195, -0.9999950652018582))) as chamfer3_piece_3:
        Polygon((2.38125 + CHAMFER3_SIZE_2, 0), (2.38125, -CHAMFER3_SIZE), (2.38125, 0), align=None)
    revolve(axis=Axis((39.6875, 0, -6.35), (1, 0, 0)), revolution_arc=359.64, mode=Mode.SUBTRACT)
    with BuildSketch(Plane(origin=(39.6875, 0, 12.065), x_dir=(0, 0.9999950652018582, 0.0031415874858796654), z_dir=(0, 0.0031415874858796654, -0.9999950652018582))) as chamfer3_piece_4:
        Polygon((2.38125 + CHAMFER3_SIZE_2, 0), (2.38125, -CHAMFER3_SIZE), (2.38125, 0), align=None)
    revolve(axis=Axis((39.6875, 0, 12.065), (1, 0, 0)), revolution_arc=359.64, mode=Mode.SUBTRACT)

    # Sketch6 → Boss-Extrude7 (add)
    with BuildSketch(Plane(origin=(0, 0, 0), x_dir=(1, 0, 0), z_dir=(0, 1, 0))):
        with Locations((19.05, 14.0335)):
            Rectangle(SKETCH6_W, SKETCH6_H)
    extrude(amount=BOSS_EXTRUDE7_DEPTH)

    # Sketch11 → Boss-Extrude10 (add)
    with BuildSketch(Plane(origin=(22.225, 0, 0), x_dir=(0, 0, -1), z_dir=(1, 0, 0))):
        with BuildLine():
            Line((13.7795, 3.81), (13.7795, 3.302))
            ThreePointArc((13.7795, 3.302), (13.5255, 3.556), (13.7795, 3.81))
        make_face()
    extrude(amount=-BOSS_EXTRUDE10_DEPTH)

    # Sketch6<5> → Cut-Extrude2 (cut)
    with BuildSketch(Plane(origin=(0, 0, 0), x_dir=(1, 0, 0), z_dir=(0, 1, 0))):
        with Locations((19.05, -19.7485)):
            Rectangle(SKETCH6_5_W, SKETCH6_5_H)
    extrude(amount=-CUT_EXTRUDE2_DEPTH, mode=Mode.SUBTRACT)

    # Sketch9 → Cut-Extrude3 (cut)
    with BuildSketch(Plane.ZY.offset(-22.225)):
        with BuildLine():
            Line((19.4945, -3.81), (19.4945, -3.302))
            ThreePointArc((19.4945, -3.302), (19.2405, -3.556), (19.4945, -3.81))
        make_face()
    extrude(amount=CUT_EXTRUDE3_DEPTH, mode=Mode.SUBTRACT)

    # Chamfer4
    chamfer4_edges = [part.edges().sort_by_distance(p)[0] for p in [
        (15.875, 0, 19.7485),
        (19.05, 0, 19.4945),
        (22.225, 0, 19.7485),
    ]]
    chamfer(chamfer4_edges, length=CHAMFER4_SIZE)

    # Chamfer5
    chamfer5_edges = [part.edges().sort_by_distance(p)[0] for p in [
        (15.875, 0, -14.0335),
        (19.05, 0, -13.7795),
        (22.225, 0, -14.0335),
    ]]
    chamfer(chamfer5_edges, length=CHAMFER5_SIZE)

    # Sketch10 → Cut-Extrude4 (cut, through all)
    with BuildSketch(Plane.XZ.offset(7.6835)):
        with Locations(Location((19.05, -6.35, 0), (0, 0, 270))):
            Circle(SKETCH10_R)
    extrude(amount=-CUT_EXTRUDE4_DEPTH, mode=Mode.SUBTRACT)

    # Chamfer6
    chamfer6_edges = [part.edges().sort_by_distance(p)[0] for p in [
        (19.05, -7.6835, -4.699),
    ]]
    chamfer6_side = [part.faces().sort_by_distance(p)[0] for p in [
        (0.215935717, -7.6835, -6.35),
    ]]
    chamfer(chamfer6_edges, length=CHAMFER6_SIZE, length2=CHAMFER6_SIZE2, reference=chamfer6_side[0])

    # Fillet1
    # the kernel refuses this fillet: 6.35 mm, written as the material it adds along each edge
    with BuildSketch(Plane(origin=(0, -6.096, 0), x_dir=(0, 0, -1), z_dir=(1, 0, 0))) as fillet1_piece_1_section:
        with BuildLine():
            CenterArc((6.344917966, 6.35), FILLET1_R, 182.292442776, 87.707557224)
            Line((0, 6.096), (0, 0))
            Line((0, 0), (6.344917966, 0))
        make_face()
    fillet1_piece_1 = extrude(amount=38.1, mode=Mode.PRIVATE)
    fillet1_piece_1 = fillet1_piece_1 - Plane(origin=(19.05, -6.096, -6.35), x_dir=(0, 0, -1), z_dir=(0, -1, 0)) * Cylinder(1.651, 102, mode=Mode.PRIVATE)
    add(fillet1_piece_1)
    with BuildSketch(Plane(origin=(38.1, -6.096, -12.7), x_dir=(0, 0, 1), z_dir=(-1, 0, 0))) as fillet1_piece_2_section:
        with BuildLine():
            CenterArc((6.344917966, 6.35), FILLET1_R, 182.292442776, 87.707557224)
            Line((0, 6.096), (0, 0))
            Line((0, 0), (6.344917966, 0))
        make_face()
    fillet1_piece_2 = extrude(amount=38.1, mode=Mode.PRIVATE)
    fillet1_piece_2 = fillet1_piece_2 - Plane(origin=(19.05, -6.096, -6.35), x_dir=(0, 0, -1), z_dir=(0, -1, 0)) * Cylinder(1.651, 102, mode=Mode.PRIVATE)
    add(fillet1_piece_2)
    with BuildSketch(Plane(origin=(0, -6.096, 5.715), x_dir=(0, 1, 0), z_dir=(1, 0, 0)), Plane(origin=(38.1, -6.096, 18.415), x_dir=(0, 1, 0), z_dir=(-1, 0, 0))) as fillet1_piece_3:
        with BuildLine():
            CenterArc((6.35, 6.344917966), FILLET1_R, 180, 87.707557224)
            Line((0, 6.344917966), (0, 0))
            Line((0, 0), (6.096, 0))
        make_face()
    extrude(amount=38.1)


solid = part.part
